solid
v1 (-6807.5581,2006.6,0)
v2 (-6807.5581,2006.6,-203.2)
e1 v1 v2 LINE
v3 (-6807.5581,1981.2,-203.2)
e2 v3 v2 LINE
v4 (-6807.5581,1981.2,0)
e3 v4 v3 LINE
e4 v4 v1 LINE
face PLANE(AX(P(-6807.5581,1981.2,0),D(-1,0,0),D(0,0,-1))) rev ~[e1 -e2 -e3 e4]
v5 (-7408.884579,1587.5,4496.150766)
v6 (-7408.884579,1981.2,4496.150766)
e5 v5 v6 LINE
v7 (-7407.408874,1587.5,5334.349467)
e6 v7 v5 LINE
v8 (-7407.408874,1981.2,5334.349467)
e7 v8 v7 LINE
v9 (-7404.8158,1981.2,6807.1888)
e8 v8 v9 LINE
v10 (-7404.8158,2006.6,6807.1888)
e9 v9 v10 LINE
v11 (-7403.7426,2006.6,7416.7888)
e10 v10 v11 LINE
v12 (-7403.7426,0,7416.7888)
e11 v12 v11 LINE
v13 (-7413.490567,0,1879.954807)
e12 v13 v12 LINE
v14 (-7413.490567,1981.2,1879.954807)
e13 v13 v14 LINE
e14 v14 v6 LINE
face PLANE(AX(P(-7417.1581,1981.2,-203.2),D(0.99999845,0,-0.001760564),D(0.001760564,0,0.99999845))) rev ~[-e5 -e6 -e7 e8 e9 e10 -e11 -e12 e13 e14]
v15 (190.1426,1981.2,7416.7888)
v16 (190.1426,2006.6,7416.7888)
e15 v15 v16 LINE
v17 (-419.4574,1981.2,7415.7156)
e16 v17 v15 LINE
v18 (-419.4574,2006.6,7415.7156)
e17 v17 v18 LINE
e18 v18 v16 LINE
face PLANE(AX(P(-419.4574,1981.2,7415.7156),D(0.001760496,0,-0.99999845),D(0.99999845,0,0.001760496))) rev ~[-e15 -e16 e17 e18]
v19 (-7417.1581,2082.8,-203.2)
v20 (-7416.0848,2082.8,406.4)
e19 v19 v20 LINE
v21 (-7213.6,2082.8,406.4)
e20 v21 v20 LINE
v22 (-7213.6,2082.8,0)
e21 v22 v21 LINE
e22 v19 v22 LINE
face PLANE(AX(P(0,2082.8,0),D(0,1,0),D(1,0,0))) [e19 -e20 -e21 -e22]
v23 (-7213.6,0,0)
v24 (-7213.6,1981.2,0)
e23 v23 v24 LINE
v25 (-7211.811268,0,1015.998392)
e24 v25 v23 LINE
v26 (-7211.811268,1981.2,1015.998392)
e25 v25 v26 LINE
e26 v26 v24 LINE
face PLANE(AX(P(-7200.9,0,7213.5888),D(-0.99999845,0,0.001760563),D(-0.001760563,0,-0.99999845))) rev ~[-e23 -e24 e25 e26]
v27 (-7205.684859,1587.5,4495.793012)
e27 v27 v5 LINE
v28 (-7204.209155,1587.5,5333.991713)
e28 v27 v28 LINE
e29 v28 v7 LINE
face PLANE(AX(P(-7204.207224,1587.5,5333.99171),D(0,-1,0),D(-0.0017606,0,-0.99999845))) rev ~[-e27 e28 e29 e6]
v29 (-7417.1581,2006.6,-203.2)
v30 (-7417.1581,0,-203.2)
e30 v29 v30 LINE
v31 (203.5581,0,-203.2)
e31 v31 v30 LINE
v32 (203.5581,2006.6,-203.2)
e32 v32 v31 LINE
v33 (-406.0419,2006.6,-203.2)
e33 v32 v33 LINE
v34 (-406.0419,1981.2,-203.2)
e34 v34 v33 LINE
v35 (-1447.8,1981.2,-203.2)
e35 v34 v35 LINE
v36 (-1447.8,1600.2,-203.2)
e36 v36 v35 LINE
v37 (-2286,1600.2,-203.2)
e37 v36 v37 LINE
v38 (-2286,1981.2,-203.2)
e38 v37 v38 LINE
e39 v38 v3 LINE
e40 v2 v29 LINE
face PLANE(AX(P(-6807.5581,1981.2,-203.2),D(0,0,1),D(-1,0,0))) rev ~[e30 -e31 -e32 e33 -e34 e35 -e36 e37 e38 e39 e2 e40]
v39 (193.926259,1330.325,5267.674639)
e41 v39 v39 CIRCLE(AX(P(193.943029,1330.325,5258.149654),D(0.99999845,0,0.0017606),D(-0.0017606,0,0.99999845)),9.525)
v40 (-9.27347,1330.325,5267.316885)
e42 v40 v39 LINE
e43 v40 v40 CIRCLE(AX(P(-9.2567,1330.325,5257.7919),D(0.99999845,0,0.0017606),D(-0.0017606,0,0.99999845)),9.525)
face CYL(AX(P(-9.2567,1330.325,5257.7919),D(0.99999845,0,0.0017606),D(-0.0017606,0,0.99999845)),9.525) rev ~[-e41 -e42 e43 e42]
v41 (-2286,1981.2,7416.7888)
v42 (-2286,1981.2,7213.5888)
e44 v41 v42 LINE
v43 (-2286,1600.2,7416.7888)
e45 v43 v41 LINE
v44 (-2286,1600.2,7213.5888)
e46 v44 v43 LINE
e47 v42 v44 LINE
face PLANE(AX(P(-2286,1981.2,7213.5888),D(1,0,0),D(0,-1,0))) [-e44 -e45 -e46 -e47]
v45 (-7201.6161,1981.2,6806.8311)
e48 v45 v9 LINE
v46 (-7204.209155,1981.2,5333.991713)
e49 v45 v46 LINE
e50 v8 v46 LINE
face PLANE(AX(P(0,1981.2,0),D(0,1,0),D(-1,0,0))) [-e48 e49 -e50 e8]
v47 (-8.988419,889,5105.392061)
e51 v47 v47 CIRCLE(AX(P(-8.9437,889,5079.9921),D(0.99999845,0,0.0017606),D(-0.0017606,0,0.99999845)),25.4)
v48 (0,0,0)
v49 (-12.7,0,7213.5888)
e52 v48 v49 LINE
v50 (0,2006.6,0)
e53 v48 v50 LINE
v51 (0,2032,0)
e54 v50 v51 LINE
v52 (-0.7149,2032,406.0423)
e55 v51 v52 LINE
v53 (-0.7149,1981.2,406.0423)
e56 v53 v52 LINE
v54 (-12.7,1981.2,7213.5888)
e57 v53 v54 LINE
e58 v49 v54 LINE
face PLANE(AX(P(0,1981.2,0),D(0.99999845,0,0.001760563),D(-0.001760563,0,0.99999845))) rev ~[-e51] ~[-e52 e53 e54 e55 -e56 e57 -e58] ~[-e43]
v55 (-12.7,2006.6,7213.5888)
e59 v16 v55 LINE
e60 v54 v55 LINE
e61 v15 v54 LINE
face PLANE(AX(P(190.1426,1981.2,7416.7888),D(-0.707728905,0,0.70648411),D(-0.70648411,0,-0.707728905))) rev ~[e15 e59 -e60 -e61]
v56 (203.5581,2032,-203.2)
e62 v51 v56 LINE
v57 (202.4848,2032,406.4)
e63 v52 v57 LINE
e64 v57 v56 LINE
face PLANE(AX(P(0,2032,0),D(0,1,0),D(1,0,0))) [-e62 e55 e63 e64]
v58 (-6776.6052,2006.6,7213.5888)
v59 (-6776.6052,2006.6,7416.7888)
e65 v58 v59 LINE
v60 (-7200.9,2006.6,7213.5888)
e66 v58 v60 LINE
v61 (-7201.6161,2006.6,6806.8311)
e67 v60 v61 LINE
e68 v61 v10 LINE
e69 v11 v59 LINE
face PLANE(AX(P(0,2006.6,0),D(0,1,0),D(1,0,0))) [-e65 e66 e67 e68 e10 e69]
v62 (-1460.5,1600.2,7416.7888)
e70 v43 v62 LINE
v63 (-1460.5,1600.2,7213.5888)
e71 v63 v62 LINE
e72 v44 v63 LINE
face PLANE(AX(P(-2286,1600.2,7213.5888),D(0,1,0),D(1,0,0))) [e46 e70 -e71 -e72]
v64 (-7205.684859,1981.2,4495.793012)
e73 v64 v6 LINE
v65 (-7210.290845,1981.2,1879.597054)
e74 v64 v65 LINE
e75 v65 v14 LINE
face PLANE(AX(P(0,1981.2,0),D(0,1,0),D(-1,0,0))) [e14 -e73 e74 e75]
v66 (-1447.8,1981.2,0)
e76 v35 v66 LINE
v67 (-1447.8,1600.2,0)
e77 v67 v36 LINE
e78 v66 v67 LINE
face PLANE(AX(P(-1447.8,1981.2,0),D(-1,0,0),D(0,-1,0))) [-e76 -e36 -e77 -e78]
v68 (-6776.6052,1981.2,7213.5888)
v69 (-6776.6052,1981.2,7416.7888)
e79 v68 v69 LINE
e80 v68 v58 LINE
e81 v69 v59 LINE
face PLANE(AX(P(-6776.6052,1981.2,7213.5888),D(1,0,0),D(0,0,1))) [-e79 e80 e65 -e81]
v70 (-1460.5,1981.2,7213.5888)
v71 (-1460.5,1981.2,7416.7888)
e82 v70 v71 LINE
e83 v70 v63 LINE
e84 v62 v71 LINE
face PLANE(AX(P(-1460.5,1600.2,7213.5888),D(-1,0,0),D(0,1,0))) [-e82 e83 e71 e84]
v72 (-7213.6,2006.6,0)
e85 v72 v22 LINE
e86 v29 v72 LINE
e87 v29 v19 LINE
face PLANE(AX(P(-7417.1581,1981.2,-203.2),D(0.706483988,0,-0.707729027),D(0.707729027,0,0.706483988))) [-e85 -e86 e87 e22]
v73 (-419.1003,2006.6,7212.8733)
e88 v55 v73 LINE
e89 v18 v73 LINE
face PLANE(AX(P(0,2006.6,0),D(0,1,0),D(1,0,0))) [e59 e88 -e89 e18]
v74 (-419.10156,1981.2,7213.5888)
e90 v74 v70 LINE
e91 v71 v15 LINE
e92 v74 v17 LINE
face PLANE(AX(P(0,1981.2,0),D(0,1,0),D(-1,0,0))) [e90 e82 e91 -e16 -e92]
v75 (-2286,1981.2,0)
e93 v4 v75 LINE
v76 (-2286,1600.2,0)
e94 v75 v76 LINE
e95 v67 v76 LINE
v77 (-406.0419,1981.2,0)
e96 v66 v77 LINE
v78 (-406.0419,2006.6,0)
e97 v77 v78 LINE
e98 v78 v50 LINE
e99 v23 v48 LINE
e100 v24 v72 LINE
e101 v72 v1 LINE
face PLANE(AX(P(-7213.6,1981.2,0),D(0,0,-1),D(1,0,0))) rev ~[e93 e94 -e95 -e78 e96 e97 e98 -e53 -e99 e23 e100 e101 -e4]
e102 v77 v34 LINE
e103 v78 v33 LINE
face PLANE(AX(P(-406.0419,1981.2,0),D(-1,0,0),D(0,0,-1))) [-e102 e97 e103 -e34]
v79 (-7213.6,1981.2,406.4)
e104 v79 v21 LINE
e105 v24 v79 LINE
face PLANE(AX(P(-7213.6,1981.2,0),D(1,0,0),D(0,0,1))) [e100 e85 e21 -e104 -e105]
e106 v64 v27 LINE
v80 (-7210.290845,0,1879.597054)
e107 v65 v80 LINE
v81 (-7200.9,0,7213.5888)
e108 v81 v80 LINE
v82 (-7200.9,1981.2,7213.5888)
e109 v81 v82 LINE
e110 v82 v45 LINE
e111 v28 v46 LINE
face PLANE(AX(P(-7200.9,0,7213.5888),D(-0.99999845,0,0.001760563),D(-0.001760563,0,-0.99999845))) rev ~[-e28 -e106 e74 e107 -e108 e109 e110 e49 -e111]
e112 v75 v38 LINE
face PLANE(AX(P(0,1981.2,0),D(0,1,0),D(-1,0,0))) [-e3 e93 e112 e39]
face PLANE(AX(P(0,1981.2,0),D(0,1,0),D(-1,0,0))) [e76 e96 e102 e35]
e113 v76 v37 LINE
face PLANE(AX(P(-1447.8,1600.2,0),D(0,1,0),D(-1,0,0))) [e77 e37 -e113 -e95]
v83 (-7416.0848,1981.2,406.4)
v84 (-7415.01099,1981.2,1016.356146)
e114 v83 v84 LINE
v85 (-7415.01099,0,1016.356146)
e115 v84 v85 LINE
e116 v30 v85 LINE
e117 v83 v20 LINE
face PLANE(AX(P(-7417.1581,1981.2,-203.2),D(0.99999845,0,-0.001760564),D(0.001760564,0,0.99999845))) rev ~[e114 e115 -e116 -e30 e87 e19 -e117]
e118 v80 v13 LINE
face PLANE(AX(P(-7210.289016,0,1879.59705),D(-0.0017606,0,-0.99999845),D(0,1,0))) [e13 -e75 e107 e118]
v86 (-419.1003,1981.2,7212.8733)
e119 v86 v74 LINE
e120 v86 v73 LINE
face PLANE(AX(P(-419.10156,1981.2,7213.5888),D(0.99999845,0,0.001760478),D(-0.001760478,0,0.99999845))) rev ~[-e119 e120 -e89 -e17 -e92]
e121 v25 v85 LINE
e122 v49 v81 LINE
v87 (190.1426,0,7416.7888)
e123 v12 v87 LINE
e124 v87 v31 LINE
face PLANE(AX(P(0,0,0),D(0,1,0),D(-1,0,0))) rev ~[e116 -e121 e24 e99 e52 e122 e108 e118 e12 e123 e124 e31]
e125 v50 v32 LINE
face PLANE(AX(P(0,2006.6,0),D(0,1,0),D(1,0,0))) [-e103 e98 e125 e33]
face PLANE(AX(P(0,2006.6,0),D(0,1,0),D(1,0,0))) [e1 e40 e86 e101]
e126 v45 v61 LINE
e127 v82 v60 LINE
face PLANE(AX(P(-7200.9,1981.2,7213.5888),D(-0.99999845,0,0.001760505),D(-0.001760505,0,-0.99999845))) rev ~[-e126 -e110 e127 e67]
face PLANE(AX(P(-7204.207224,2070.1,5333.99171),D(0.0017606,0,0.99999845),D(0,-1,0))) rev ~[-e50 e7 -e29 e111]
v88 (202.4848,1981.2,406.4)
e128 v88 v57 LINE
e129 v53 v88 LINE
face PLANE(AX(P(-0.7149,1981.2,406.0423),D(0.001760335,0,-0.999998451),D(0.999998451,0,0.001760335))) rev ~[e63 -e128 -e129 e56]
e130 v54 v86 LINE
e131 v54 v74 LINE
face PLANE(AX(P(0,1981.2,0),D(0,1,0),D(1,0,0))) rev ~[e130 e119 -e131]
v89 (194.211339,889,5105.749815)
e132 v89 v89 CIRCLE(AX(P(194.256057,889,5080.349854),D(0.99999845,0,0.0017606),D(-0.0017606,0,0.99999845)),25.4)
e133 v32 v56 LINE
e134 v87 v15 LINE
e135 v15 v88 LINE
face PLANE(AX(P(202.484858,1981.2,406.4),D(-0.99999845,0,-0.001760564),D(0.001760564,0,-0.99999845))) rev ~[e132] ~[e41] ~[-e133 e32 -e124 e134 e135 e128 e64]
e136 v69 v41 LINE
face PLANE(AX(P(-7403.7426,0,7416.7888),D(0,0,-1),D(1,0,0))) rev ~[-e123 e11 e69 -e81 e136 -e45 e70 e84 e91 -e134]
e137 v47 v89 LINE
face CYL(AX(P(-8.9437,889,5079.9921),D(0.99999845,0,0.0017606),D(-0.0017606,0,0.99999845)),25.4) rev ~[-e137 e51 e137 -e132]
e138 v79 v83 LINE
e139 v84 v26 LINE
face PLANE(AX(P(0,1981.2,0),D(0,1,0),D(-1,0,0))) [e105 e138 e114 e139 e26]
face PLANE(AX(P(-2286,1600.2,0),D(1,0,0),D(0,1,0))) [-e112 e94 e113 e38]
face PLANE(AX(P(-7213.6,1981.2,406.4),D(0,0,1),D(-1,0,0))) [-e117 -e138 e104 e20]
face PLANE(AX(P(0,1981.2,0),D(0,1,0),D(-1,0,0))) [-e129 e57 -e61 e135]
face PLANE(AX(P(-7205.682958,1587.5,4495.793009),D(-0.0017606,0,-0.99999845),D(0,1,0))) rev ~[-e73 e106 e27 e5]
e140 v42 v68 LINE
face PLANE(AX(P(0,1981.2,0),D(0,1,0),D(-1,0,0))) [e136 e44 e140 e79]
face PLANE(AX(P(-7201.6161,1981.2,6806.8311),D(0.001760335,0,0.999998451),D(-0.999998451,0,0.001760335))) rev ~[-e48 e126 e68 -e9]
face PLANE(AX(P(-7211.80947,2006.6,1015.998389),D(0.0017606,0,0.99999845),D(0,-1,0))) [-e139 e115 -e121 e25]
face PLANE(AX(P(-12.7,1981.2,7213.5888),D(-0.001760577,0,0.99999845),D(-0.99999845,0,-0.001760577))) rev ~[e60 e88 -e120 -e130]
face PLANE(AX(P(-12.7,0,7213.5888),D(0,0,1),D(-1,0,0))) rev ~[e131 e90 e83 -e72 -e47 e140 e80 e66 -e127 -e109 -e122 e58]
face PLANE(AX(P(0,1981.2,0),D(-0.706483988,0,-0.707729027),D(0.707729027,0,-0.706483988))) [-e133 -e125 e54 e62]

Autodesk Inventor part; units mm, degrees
ref_plane "YZ Plane" through (0, 0, 0) normal (1, 0, 0) x (0, 1, 0)
ref_plane "XZ Plane" through (0, 0, 0) normal (0, 1, 0) x (-1, 0, 0)
sketch "Sketch1" plane through (0, 0, 0) normal (0, 1, 0) x (-1, 0, 0)
  line L0 (0, 0) -> (12.7, 7213.5888)
  line L1 (12.7, 7213.5888) -> (7200.9, 7213.5888)
  line L2 (7200.9, 7213.5888) -> (7213.6, 0)
  line L3 (7213.6, 0) -> (0, 0)
  line L4 (7403.7426, 7416.7888) -> (-190.1426, 7416.7888)
  line L5 (-190.1426, 7416.7888) -> (-203.5581, -203.2)
  line L6 (-203.5581, -203.2) -> (7417.1581, -203.2)
  line L7 (7417.1581, -203.2) -> (7403.7426, 7416.7888)
  dimension "d1" = 7188.2
  dimension "d3" = 12.7
  dimension "d4" = 7213.6
  dimension "d5" = 7213.6
  dimension "d6" = 203.2
  dimension "d8" = 7213.6
extrude "Extrusion1" add sketch "Sketch1" along normal blind 1981.2
sketch "Sketch3" plane through (-12.7, 0, 7213.5888) normal (0, 0, -1) x (-1, 0, 0)
  line L0 (7391.0426, 1981.2) -> (-202.8426, 1981.2) projected
  line L1 (2273.3, 2006.6) -> (2273.3, 1600.2)
  line L2 (2273.3, 1600.2) -> (1447.8, 1600.2)
  line L3 (1447.8, 1600.2) -> (1447.8, 2006.6)
  line L4 (0, 0) -> (0, 1981.2) projected
  line L5 (0, 0) -> (7188.2, 0) projected
  line L6 (1447.8, 2006.6) -> (2273.3, 2006.6)
  point P0 (-12.7, 0)
  dimension "d20" = 1447.8
  dimension "d102" = 825.5
  dimension "d103" = 406.4
  dimension "d104" = 25.4
extrude "Extrusion2" cut sketch "Sketch3" against normal up to surface (203.2 mm away)
sketch "Sketch4" plane through (-12.7, 0, 7213.5888) normal (-0.9999985, 0, -0.0017606) x (-0.0017606, 0, 0.9999985)
  line L0 (-7213.6, 0) -> (0, 0) projected
  line L1 (-7213.6, 0) -> (-7213.6, 1981.2) projected
  point P0 (-1955.8, 1330.325)
  dimension "d27" = 1330.325
  dimension "d28" = 5257.8
hole "Hole1" at (-9.2567, 1330.325, 5257.7919) direction (0.9999985, 0, 0.0017606) diameter 19.05 end through all
sketch "Sketch5" plane through (-12.7, 0, 7213.5888) normal (-0.9999985, 0, -0.0017606) x (-0.0017606, 0, 0.9999985)
  line L0 (-7213.6, 0) -> (0, 0) projected
  line L1 (-7213.6, 0) -> (-7213.6, 1981.2) projected
  point P0 (-2133.6, 889)
  dimension "d36" = 889
  dimension "d37" = 5080
hole "Hole2" at (-8.9437, 889, 5079.9921) direction (0.9999985, 0, 0.0017606) diameter 50.8 end through all
sketch "Sketch6" plane through (-7213.6, 0, 0) normal (0, 0, 1) x (1, 0, 0)
  line L0 (7417.1581, 1981.2) -> (-203.5581, 1981.2) projected
  line L1 (7213.6, 0) -> (7213.6, 1981.2) projected
  line L2 (0, 0) -> (7213.6, 0) projected
  line L3 (5765.8, 1600.2) -> (4927.6, 1600.2)
  line L4 (4927.6, 1600.2) -> (4927.6, 2006.6)
  line L5 (4927.6, 2006.6) -> (5765.8, 2006.6)
  line L6 (5765.8, 2006.6) -> (5765.8, 1600.2)
  dimension "d105" = 406.4
  dimension "d106" = 1447.8
  dimension "d107" = 838.2
  dimension "d108" = 25.4
extrude "Extrusion3" cut sketch "Sketch6" against normal up to surface (203.2 mm away)
sketch "Sketch8" plane through (-7200.9, 0, 7213.5888) normal (0.9999985, 0, -0.0017606) x (-0.0017606, 0, -0.9999985)
  line L0 (2717.8, 2070.1) -> (1879.6, 2070.1)
  line L1 (1879.6, 2070.1) -> (1879.6, 1587.5)
  line L2 (1879.6, 1587.5) -> (2717.8, 1587.5)
  line L3 (2717.8, 1587.5) -> (2717.8, 2070.1)
  line L4 (0, 0) -> (0, 1981.2) projected
  line L5 (0, 0) -> (7213.6, 0) projected
  point P0 (7200.9, 0)
  point P1 (4368.8, 0)
  dimension "d56" = 2717.8
  dimension "d118" = 1587.5
  dimension "d119" = 482.6
  dimension "d120" = 838.2
extrude "Extrusion5" cut sketch "Sketch8" against normal up to surface (203.2 mm away)
sketch "Sketch13" plane through (0, 1981.2, 0) normal (0, 1, 0) x (1, 0, 0)
  line L0 (0, 0) -> (-12.7, -7213.5888) projected
  line L1 (190.1426, -7416.7888) -> (203.5581, 203.2) projected
  line L2 (0, 0) -> (203.5581, 203.2)
  line L3 (203.5581, 203.2) -> (202.4848, -406.4)
  line L4 (-0.7149, -406.0423) -> (0, 0)
  line L5 (-0.7149, -406.0423) -> (202.4848, -406.4)
  dimension "d84" = 609.6
extrude "Extrusion9" add sketch "Sketch13" along normal blind 50.8
sketch "Sketch14" plane through (0, 1981.2, 0) normal (0, 1, 0) x (1, 0, 0)
  line L0 (190.1426, -7416.7888) -> (203.5581, 203.2) projected
  line L1 (0, 0) -> (-12.7, -7213.5888) projected
  line L2 (190.1426, -7416.7888) -> (-12.7, -7213.5888)
  line L3 (-12.7, -7213.5888) -> (-419.1003, -7212.8733)
  line L4 (-419.1003, -7212.8733) -> (-419.4574, -7415.7156)
  line L5 (-419.4574, -7415.7156) -> (190.1426, -7416.7888)
  line L6 (-7403.7426, -7416.7888) -> (-2286, -7416.7888) projected
  line L7 (-12.7, -7213.5888) -> (-7200.9, -7213.5888) projected
  line L8 (-7403.7426, -7416.7888) -> (-7200.9, -7213.5888)
  line L9 (-7403.7426, -7416.7888) -> (-6776.6052, -7416.7888)
  line L10 (-7200.9, -7213.5888) -> (-6776.6052, -7213.5888)
  line L11 (-6776.6052, -7213.5888) -> (-6776.6052, -7416.7888)
  point P0 (202.4848, -406.4)
  point P1 (-0.7149, -406.0423)
  dimension "d87" = 609.6
  dimension "d91" = 627.1374
extrude "Extrusion10" add sketch "Sketch14" along normal blind 25.4
sketch "Sketch15" plane through (0, 1981.2, 0) normal (0, 1, 0) x (1, 0, 0)
  line L0 (-7200.9, -7213.5888) -> (-7403.7426, -7416.7888) projected
  line L1 (-7403.7426, -7416.7888) -> (-7200.9, -7213.5888)
  line L2 (-7200.9, -7213.5888) -> (-7201.6161, -6806.8311)
  line L3 (-7200.9, -7213.5888) -> (-7213.6, 0) projected
  line L4 (-7201.6161, -6806.8311) -> (-7404.8158, -6807.1888)
  line L5 (-7417.1581, 203.2) -> (-7403.7426, -7416.7888) projected
  line L6 (-7404.8158, -6807.1888) -> (-7403.7426, -7416.7888)
  point P0 (0, 0)
  point P1 (-7208.5915, -2844.7956)
  point P2 (-7411.7912, -2845.1533)
  dimension "d92" = 609.6
extrude "Extrusion11" add sketch "Sketch15" along normal blind 25.4
sketch "Sketch16" plane through (0, 1981.2, 0) normal (0, 1, 0) x (1, 0, 0)
  line L0 (203.5581, 203.2) -> (-7417.1581, 203.2) projected
  line L1 (-7213.6, 0) -> (0, 0) projected
  line L2 (-7417.1581, 203.2) -> (-7213.6, 0)
  line L3 (-7213.6, 0) -> (-7213.6, -406.4)
  line L4 (-7213.6, -406.4) -> (-7416.0848, -406.4)
  line L5 (-7417.1581, 203.2) -> (-7403.7426, -7416.7888) projected
  line L6 (-7417.1581, 203.2) -> (-7416.0848, -406.4)
  point P0 (-7415.011, -1016.3562)
  dimension "d95" = 609.6
extrude "Extrusion12" add sketch "Sketch16" along normal blind 101.6
sketch "Sketch17" plane through (0, 1981.2, 0) normal (0, 1, 0) x (1, 0, 0)
  line L0 (-7417.1581, 203.2) -> (-7403.7426, -7416.7888) projected
  line L1 (-7417.1581, 203.2) -> (-7213.6, 0) projected
  line L2 (-7417.1581, 203.2) -> (-7213.6, 0)
  line L3 (-7213.6, 0) -> (-6807.5581, 0)
  line L4 (-7213.6, 0) -> (0, 0) projected
  line L5 (-6807.5581, 0) -> (-6807.5581, 203.2)
  line L6 (203.5581, 203.2) -> (-7417.1581, 203.2) projected
  line L7 (-6807.5581, 203.2) -> (-7417.1581, 203.2)
  line L8 (0, 0) -> (203.5581, 203.2) projected
  line L9 (203.5581, 203.2) -> (0, 0)
  line L10 (0, 0) -> (-406.0419, 0)
  line L11 (-406.0419, 0) -> (-406.0419, 203.2)
  line L12 (-406.0419, 203.2) -> (203.5581, 203.2)
  point P0 (-7415.011, -1016.3562)
  dimension "d98" = 609.6
  dimension "d99" = 609.6
extrude "Extrusion13" add sketch "Sketch17" along normal blind 25.4 contours L6 L5 L3 L1 | L6 L8 L4 L11
ref_plane "Work Plane2" through (-7200.9, 0, 7213.5888) normal (-1, 0, 0) x (0, 1, 0)
sketch "Sketch20" plane through (-7204.2092, 1587.5, 5333.9917) normal (0.9999985, 0, -0.0017606) x (-0.0017606, 0, -0.9999985)
  line L0 (5537.5581, -1587.5) -> (-2082.4426, -1587.5) projected
  line L1 (4318, -1587.5) -> (3454.4, -1587.5)
  line L2 (3454.4, -1587.5) -> (3454.4, 419.1)
  line L3 (3454.4, 419.1) -> (4318, 419.1)
  line L4 (4318, 419.1) -> (4318, -1587.5)
  line L5 (5334, 419.1) -> (5334, 495.3) projected
  point P0 (5321.3, -1587.5)
  point P1 (5334, 457.2)
  point P2 (3454.4, -1587.5)
  dimension "d122" = 1016
  dimension "d123" = 2006.6
  dimension "d124" = 863.6
extrude "Extrusion16" cut sketch "Sketch20" against normal up to surface (203.2 mm away)
properties part number "Exterior_Walls" material "Concrete"
